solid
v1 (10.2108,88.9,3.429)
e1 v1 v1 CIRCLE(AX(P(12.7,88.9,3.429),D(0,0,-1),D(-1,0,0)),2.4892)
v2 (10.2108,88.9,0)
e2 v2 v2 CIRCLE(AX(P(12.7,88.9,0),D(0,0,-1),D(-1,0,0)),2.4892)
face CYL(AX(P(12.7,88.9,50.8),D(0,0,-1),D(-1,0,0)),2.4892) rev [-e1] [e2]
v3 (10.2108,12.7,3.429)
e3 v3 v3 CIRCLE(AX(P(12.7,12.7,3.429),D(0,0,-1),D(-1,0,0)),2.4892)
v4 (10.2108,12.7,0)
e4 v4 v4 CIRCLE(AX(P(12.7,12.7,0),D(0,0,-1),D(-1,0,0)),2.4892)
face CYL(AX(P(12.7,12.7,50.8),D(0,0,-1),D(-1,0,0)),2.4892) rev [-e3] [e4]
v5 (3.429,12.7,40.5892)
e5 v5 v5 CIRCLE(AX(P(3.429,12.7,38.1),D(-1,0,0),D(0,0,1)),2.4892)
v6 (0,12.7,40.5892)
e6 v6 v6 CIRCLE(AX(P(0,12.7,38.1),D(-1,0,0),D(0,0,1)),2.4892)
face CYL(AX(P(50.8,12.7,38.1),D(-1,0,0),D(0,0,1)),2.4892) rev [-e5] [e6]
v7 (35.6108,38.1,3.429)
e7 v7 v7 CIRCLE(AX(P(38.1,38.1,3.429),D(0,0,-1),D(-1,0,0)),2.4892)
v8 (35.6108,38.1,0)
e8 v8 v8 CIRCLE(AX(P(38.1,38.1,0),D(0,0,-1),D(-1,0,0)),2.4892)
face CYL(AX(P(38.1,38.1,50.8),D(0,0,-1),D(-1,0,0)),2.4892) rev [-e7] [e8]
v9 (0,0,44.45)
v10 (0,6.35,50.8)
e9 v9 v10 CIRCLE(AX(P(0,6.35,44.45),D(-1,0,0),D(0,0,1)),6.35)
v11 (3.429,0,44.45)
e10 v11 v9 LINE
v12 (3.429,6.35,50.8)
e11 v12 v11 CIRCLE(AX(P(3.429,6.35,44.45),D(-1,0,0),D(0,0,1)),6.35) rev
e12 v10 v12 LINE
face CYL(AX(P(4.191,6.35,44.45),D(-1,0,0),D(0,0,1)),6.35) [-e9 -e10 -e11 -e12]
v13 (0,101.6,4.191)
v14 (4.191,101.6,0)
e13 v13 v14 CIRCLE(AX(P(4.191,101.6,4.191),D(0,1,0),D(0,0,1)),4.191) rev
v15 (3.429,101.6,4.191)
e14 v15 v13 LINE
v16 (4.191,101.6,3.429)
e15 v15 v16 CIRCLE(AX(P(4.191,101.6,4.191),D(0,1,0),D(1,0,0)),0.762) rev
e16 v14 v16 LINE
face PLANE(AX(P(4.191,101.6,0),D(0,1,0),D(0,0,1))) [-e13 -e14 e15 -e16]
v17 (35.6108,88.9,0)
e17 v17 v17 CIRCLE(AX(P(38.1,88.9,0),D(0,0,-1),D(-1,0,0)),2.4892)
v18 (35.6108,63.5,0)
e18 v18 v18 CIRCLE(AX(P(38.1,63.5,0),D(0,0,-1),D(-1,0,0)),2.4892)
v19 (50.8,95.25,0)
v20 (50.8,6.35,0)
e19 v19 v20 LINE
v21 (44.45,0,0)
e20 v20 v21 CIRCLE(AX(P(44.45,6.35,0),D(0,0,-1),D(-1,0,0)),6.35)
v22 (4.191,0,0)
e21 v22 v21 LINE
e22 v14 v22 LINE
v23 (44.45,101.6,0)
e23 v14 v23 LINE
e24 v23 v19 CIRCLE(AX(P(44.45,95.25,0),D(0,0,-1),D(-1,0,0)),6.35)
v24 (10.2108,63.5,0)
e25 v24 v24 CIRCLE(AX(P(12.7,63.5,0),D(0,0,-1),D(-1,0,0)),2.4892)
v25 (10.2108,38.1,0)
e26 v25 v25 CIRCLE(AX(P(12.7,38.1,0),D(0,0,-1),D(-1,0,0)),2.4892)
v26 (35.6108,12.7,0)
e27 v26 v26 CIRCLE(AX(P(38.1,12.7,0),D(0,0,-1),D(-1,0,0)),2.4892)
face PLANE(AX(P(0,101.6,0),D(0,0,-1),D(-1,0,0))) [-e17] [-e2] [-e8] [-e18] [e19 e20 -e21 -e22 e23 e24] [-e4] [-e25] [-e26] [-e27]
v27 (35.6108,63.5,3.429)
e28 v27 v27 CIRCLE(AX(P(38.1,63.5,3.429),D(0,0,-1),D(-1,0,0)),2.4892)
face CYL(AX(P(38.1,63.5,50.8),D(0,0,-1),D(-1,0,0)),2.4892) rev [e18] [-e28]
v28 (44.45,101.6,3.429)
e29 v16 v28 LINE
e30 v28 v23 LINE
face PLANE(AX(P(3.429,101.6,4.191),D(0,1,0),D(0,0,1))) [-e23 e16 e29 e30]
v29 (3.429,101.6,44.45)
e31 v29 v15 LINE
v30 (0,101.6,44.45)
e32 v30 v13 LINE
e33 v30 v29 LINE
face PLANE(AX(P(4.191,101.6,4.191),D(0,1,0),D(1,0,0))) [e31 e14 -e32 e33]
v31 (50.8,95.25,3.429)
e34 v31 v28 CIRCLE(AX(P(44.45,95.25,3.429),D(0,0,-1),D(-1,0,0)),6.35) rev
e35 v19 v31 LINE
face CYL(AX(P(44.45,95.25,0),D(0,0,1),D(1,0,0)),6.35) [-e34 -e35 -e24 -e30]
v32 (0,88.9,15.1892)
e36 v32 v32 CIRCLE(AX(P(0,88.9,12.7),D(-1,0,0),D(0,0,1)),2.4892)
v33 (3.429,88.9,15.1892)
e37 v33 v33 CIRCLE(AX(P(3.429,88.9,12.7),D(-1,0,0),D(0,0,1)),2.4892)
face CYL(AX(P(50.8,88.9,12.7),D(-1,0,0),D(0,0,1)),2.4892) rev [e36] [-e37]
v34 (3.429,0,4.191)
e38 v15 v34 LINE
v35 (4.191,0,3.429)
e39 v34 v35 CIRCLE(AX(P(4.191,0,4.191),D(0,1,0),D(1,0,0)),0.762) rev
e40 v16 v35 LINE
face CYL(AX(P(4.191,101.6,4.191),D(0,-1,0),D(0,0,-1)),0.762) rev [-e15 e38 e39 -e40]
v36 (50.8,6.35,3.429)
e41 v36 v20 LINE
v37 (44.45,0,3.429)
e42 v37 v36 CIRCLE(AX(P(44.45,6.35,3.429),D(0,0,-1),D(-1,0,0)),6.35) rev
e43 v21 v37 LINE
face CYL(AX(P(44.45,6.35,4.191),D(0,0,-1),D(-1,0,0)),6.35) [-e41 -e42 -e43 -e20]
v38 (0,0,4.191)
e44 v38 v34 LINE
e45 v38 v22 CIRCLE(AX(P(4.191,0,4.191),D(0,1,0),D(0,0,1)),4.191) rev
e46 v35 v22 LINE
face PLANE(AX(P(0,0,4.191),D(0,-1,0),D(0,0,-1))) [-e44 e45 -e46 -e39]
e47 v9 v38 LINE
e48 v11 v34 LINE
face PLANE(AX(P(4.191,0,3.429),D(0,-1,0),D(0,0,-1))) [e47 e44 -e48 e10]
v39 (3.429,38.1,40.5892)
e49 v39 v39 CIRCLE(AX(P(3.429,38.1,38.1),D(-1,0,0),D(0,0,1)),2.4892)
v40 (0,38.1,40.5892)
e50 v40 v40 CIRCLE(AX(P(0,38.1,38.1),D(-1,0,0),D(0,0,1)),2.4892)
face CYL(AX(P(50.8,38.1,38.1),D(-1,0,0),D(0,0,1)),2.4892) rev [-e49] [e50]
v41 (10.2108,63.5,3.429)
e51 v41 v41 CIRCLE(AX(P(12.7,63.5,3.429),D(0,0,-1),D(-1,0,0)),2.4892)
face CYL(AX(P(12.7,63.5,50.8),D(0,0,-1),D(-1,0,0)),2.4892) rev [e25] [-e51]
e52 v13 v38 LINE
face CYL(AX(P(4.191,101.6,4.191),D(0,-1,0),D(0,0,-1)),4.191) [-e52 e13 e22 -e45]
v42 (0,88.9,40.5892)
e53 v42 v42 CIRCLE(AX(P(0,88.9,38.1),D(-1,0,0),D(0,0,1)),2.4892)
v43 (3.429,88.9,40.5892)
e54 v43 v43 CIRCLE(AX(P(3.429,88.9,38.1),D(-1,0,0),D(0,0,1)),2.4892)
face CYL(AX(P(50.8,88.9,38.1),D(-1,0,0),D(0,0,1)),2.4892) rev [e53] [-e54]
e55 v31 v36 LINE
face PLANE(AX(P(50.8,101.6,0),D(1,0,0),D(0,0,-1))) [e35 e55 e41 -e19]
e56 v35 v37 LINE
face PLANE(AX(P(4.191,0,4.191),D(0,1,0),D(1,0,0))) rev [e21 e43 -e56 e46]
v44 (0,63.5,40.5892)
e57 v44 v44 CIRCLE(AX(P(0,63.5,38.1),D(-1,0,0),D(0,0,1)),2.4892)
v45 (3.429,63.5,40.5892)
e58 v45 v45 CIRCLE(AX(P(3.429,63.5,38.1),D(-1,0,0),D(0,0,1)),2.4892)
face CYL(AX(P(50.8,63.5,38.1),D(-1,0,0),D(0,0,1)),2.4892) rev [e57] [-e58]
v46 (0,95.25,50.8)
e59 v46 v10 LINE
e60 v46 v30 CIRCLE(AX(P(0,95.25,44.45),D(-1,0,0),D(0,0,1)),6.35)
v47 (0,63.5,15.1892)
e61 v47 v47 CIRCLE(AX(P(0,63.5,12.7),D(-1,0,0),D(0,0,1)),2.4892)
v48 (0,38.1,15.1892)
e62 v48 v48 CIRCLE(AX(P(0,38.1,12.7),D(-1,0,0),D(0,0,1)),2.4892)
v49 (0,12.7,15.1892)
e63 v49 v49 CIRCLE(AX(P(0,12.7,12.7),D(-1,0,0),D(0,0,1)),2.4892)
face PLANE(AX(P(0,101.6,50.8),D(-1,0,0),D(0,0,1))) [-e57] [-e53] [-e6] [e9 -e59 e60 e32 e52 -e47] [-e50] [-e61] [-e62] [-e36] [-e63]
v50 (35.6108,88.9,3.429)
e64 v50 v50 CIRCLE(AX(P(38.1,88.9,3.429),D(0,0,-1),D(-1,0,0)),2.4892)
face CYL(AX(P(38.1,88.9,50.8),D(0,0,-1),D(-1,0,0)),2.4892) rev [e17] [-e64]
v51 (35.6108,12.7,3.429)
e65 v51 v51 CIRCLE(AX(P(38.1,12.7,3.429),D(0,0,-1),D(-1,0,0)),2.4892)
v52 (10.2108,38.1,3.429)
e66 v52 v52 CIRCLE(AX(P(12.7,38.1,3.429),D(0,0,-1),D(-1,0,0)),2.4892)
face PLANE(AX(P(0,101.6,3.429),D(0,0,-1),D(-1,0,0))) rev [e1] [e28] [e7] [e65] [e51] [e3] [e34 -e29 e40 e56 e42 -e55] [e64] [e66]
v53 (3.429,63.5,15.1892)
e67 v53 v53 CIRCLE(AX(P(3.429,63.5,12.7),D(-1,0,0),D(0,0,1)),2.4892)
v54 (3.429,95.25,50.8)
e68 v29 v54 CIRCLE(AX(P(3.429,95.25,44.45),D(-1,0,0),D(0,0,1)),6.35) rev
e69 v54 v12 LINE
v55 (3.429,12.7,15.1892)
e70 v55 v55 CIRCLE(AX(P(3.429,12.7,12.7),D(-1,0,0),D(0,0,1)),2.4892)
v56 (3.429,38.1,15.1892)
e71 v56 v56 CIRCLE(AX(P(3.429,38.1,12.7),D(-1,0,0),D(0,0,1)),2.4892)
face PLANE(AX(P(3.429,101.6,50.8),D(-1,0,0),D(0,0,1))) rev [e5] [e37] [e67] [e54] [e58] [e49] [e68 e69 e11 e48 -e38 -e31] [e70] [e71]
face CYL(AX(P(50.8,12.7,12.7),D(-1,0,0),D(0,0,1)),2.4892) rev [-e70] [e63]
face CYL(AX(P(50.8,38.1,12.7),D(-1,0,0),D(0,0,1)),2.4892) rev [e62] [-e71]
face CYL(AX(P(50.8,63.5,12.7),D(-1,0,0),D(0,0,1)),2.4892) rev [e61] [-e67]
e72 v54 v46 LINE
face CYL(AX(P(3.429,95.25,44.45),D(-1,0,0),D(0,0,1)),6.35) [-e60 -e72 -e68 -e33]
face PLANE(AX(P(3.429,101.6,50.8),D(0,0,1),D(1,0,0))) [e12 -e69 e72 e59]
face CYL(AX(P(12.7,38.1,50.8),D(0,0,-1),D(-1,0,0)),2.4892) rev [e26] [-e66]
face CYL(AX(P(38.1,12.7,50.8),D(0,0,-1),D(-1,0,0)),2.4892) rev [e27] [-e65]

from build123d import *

# Parameters (mm, degrees)
BASE_FLANGE1_DEPTH = 101.6
SKETCH7_R          = 2.4892
CUT_EXTRUDE1_DEPTH = 125.434078933
SKETCH8_R          = 2.4892
CUT_EXTRUDE2_DEPTH = 125.434078933
FILLET1_R          = 6.35


# Sheet-metal steps are written as plain solids
with BuildPart() as part:
    # Sketch2 → Base-Flange1 (new body)
    with BuildSketch(Plane(origin=(0, 0, 0), x_dir=(1, 0, 0), z_dir=(0, 1, 0))):
        with BuildLine():
            Line((0, -50.8), (0, -4.191))
            ThreePointArc((0, -4.191), (1.22751548, -1.22751548), (4.191, 0))
            Line((4.191, 0), (50.8, 0))
            Line((50.8, 0), (50.8, -3.429))
            Line((50.8, -3.429), (4.191, -3.429))
            ThreePointArc((4.191, -3.429), (3.652184633, -3.652184633), (3.429, -4.191))
            Line((3.429, -4.191), (3.429, -50.8))
            Line((3.429, -50.8), (0, -50.8))
        make_face()
    extrude(amount=BASE_FLANGE1_DEPTH)

    # Sketch7 → Cut-Extrude1 (cut, through all)
    with BuildSketch(Plane.ZY):
        with Locations((38.1, 88.9)):
            Circle(SKETCH7_R)
        with Locations((12.7, 88.9)):
            Circle(SKETCH7_R)
        with Locations((12.7, 63.5)):
            Circle(SKETCH7_R)
        with Locations((12.7, 38.1)):
            Circle(SKETCH7_R)
        with Locations((12.7, 12.7)):
            Circle(SKETCH7_R)
        with Locations((38.1, 63.5)):
            Circle(SKETCH7_R)
        with Locations((38.1, 38.1)):
            Circle(SKETCH7_R)
        with Locations((38.1, 12.7)):
            Circle(SKETCH7_R)
    extrude(amount=-CUT_EXTRUDE1_DEPTH, mode=Mode.SUBTRACT)

    # Sketch8 → Cut-Extrude2 (cut, through all)
    with BuildSketch(Plane(origin=(0, 0, 0), x_dir=(-1, 0, 0), z_dir=(0, 0, -1))):
        with Locations((-38.1, 88.9)):
            Circle(SKETCH8_R)
        with Locations((-12.7, 88.9)):
            Circle(SKETCH8_R)
        with Locations((-12.7, 63.5)):
            Circle(SKETCH8_R)
        with Locations((-12.7, 38.1)):
            Circle(SKETCH8_R)
        with Locations((-12.7, 12.7)):
            Circle(SKETCH8_R)
        with Locations((-38.1, 63.5)):
            Circle(SKETCH8_R)
        with Locations((-38.1, 38.1)):
            Circle(SKETCH8_R)
        with Locations((-38.1, 12.7)):
            Circle(SKETCH8_R)
    extrude(amount=-CUT_EXTRUDE2_DEPTH, mode=Mode.SUBTRACT)

    # Fillet1
    fillet1_edges = [part.edges().sort_by_distance(p)[0] for p in [
        (1.7145, 101.6, 50.8),
        (1.7145, 0, 50.8),
        (50.8, 101.6, 1.7145),
        (50.8, 0, 1.7145),
    ]]
    fillet(fillet1_edges, radius=FILLET1_R)


solid = part.part
